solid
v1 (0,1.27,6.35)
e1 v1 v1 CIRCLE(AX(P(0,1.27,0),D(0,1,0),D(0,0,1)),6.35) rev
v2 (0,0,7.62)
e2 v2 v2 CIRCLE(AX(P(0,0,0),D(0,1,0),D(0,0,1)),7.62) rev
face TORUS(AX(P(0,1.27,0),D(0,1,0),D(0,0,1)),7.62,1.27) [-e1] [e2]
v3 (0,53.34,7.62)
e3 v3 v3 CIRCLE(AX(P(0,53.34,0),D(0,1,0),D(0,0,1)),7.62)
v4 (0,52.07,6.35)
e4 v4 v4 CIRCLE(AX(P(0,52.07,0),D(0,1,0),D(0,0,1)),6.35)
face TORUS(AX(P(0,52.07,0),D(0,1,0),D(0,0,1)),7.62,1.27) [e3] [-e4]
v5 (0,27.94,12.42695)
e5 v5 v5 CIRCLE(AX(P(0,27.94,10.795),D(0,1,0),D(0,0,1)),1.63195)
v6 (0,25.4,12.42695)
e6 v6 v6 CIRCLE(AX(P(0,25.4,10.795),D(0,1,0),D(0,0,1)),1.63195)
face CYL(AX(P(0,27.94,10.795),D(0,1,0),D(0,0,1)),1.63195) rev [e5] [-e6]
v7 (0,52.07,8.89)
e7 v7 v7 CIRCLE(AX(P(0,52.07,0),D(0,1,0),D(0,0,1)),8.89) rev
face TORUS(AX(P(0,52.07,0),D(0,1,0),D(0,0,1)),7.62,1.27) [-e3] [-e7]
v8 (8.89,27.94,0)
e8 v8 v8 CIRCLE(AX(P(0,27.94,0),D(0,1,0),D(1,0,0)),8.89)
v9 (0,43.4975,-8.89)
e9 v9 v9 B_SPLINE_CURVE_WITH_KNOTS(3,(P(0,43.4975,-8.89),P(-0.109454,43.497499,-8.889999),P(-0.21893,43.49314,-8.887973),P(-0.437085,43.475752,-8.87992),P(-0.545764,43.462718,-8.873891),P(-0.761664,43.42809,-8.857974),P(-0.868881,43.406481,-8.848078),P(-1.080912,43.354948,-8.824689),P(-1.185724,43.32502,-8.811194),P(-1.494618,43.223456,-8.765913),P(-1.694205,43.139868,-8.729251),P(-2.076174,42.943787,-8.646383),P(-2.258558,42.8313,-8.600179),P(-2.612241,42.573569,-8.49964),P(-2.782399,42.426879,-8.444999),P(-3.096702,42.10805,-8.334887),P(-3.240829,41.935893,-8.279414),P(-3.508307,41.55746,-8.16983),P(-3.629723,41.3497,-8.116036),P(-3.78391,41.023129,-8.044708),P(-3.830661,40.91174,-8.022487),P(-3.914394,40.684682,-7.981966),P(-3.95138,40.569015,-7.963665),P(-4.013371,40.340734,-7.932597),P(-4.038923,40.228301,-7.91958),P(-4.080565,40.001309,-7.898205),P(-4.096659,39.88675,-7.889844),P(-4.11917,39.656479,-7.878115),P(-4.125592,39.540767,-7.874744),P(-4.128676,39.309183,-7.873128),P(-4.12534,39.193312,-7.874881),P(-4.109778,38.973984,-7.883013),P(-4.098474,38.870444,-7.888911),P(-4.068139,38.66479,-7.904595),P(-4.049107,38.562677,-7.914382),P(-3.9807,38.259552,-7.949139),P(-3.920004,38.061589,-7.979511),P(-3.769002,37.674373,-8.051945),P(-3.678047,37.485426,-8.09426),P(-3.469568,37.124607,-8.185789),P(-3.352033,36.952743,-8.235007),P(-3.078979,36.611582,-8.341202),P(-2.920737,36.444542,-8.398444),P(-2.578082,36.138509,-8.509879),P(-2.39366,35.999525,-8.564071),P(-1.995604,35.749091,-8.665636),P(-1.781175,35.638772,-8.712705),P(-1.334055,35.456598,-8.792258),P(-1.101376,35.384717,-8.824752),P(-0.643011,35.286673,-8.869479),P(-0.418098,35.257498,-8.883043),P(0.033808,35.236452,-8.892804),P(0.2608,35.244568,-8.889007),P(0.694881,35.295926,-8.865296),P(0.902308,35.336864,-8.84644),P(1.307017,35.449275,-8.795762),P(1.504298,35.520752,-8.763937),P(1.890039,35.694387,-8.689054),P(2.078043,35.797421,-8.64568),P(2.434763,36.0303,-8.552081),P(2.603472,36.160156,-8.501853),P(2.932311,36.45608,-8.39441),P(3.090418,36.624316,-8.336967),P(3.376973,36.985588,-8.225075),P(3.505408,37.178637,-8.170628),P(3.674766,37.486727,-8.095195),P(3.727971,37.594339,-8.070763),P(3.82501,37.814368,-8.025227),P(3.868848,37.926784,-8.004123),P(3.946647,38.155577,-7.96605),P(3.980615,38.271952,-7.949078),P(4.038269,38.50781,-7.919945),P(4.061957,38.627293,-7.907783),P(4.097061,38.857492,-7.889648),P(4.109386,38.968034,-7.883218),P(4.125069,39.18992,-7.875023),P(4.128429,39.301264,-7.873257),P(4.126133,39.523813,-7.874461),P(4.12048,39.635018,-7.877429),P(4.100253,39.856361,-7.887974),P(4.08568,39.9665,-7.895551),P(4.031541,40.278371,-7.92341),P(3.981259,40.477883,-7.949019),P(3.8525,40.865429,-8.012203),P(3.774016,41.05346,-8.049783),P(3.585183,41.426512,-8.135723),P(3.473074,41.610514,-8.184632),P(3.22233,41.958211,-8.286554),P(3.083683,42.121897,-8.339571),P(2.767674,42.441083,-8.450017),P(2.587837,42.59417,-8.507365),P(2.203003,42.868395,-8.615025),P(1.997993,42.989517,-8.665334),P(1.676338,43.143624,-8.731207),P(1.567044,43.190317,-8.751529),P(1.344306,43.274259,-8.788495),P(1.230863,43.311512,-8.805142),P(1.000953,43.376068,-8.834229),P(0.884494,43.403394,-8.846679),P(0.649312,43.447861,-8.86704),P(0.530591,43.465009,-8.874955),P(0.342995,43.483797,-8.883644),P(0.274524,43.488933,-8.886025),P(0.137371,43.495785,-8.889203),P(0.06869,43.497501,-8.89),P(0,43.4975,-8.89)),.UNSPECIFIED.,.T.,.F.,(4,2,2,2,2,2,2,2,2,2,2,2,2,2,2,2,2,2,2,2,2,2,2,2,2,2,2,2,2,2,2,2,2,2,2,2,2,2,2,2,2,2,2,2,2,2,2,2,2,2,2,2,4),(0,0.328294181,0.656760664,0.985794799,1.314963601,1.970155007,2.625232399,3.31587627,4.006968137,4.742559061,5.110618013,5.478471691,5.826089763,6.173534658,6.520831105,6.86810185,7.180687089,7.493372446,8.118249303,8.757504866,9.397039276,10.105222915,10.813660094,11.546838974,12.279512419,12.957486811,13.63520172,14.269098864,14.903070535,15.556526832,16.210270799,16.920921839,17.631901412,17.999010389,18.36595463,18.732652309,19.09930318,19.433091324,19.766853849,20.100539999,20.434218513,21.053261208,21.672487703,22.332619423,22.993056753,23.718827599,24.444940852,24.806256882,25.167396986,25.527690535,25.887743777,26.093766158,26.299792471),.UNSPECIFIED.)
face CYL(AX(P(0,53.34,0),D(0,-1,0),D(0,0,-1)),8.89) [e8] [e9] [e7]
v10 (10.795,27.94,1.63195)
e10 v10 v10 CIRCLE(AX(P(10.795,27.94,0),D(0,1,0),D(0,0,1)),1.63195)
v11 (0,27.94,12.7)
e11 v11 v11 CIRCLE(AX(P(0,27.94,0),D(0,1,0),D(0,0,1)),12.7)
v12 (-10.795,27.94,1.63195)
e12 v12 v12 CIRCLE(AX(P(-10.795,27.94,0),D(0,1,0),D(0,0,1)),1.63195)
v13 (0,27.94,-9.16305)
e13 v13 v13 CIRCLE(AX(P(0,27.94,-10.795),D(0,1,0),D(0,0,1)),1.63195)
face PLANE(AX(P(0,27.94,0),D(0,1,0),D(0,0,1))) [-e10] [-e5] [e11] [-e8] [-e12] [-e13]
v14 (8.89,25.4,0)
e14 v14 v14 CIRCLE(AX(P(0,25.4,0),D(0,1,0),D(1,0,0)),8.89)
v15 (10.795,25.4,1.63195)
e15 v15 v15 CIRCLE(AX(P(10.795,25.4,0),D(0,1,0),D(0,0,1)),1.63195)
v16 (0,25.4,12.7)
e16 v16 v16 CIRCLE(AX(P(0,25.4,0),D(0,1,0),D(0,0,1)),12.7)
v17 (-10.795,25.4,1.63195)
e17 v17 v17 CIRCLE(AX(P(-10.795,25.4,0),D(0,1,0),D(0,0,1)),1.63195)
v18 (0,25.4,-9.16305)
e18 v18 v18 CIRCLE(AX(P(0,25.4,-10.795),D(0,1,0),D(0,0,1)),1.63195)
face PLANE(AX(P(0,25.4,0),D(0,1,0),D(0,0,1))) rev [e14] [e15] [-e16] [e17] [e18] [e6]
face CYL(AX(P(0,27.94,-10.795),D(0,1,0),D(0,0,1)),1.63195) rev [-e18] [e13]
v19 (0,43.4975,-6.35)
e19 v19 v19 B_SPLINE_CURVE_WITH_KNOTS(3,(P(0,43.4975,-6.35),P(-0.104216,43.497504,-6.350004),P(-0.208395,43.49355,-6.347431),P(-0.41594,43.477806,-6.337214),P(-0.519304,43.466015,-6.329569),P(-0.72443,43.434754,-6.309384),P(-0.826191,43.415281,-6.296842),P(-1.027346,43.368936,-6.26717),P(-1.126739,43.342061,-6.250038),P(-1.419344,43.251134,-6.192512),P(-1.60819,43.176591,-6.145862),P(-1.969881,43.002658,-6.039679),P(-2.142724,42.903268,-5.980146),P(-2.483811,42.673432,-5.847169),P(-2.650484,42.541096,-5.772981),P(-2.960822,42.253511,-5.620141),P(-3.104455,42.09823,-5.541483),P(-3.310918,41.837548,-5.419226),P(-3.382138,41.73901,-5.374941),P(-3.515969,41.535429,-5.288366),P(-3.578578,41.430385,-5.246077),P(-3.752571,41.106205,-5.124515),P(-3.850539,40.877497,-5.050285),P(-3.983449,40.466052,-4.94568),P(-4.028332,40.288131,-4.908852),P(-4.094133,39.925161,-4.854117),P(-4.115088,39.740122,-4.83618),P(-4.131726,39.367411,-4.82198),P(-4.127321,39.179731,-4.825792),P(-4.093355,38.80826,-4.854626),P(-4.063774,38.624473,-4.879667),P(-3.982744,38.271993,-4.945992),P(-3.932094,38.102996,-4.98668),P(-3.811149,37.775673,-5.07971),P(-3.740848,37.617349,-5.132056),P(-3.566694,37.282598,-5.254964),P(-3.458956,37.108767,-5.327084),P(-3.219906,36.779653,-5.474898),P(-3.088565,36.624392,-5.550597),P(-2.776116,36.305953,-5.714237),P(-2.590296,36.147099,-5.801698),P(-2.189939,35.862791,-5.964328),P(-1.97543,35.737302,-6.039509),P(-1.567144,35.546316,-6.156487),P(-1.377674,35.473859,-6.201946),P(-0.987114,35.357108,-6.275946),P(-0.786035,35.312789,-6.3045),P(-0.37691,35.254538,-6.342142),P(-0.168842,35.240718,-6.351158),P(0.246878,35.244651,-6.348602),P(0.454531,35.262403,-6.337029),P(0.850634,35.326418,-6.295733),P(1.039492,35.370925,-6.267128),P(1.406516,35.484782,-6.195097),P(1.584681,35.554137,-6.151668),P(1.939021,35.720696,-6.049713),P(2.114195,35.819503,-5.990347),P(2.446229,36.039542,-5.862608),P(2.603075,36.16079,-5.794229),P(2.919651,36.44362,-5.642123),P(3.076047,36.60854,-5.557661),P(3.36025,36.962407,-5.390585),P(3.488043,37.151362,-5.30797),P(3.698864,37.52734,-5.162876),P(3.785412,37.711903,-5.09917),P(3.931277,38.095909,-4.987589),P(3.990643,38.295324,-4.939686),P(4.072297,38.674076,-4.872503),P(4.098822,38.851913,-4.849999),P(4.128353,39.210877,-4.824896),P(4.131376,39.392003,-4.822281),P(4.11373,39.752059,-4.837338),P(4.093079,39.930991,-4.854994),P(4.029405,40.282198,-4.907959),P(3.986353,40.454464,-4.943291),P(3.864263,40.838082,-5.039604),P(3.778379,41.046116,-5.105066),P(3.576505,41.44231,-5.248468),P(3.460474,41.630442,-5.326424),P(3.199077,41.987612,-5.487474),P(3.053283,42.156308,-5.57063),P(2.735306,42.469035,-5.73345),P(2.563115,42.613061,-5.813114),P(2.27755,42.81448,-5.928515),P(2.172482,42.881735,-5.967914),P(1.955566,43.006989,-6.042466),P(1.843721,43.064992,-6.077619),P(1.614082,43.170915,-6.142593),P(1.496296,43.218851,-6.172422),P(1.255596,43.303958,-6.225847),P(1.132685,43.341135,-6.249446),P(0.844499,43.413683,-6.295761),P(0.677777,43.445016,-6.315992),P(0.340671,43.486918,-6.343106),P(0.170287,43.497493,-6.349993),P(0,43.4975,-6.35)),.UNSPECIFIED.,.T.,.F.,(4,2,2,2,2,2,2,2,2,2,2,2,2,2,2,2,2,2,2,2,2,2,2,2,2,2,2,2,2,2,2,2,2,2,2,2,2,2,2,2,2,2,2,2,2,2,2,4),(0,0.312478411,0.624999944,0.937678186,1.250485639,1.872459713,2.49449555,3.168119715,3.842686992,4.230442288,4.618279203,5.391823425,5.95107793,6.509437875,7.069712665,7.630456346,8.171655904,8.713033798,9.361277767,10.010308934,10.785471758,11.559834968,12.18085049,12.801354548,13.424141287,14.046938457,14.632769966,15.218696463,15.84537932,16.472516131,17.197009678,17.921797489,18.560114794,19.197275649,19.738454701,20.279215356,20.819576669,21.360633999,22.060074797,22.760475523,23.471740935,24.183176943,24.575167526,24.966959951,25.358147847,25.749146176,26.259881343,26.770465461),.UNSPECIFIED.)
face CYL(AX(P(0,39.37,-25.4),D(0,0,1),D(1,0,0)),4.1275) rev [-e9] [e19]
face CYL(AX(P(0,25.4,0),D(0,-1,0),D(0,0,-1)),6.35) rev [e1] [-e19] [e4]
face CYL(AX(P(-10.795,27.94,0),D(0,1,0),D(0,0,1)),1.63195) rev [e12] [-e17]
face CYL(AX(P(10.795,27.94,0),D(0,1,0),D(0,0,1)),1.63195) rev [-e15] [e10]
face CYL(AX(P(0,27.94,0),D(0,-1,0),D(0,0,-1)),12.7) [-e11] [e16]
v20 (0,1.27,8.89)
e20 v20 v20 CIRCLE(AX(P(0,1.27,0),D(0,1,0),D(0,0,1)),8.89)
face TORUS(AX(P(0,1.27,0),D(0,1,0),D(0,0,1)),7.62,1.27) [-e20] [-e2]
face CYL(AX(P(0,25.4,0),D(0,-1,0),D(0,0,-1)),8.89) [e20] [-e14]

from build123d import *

# Parameters (mm, degrees)
SKETCH1_R                 = 8.89
SKETCH1_R_2               = 6.35
EXTRUDE_THIN1_DEPTH       = 25.4
SKETCH2_R                 = 12.7
SKETCH2_R_2               = 6.35
BOSS_EXTRUDE1_DEPTH       = 2.54
SKETCH3_R                 = 8.89
SKETCH3_R_2               = 6.35
EXTRUDE_THIN2_DEPTH       = 25.4
SKETCH4_R                 = 4.1275
CUT_EXTRUDE1_DEPTH        = 25.4
F_4_CLEARANCE_HOLE1_D     = 3.2639
F_4_CLEARANCE_HOLE1_DEPTH = 25.4
F_4_CLEARANCE_HOLE1_TIP   = 0.980574487
FILLET2_R                 = 1.27
FILLET3_R                 = 1.27


with BuildPart() as part:
    # Sketch1 → Extrude-Thin1 (new body)
    with BuildSketch(Plane(origin=(0, 0, 0), x_dir=(1, 0, 0), z_dir=(0, 1, 0))):
        Circle(SKETCH1_R)
        Circle(SKETCH1_R_2, mode=Mode.SUBTRACT)
    extrude(amount=EXTRUDE_THIN1_DEPTH)

    # Sketch2 → Boss-Extrude1 (add)
    with BuildSketch(Plane(origin=(0, 25.4, 0), x_dir=(1, 0, 0), z_dir=(0, 1, 0))):
        with Locations(Location((0, 0, 0), (0, 0, 270))):
            Circle(SKETCH2_R)
        with Locations(Location((0, 0, 0), (0, 0, 270))):
            Circle(SKETCH2_R_2, mode=Mode.SUBTRACT)
    extrude(amount=BOSS_EXTRUDE1_DEPTH)

    # Sketch3 → Extrude-Thin2 (add)
    with BuildSketch(Plane(origin=(0, 27.94, 0), x_dir=(1, 0, 0), z_dir=(0, 1, 0))):
        Circle(SKETCH3_R)
        Circle(SKETCH3_R_2, mode=Mode.SUBTRACT)
    extrude(amount=EXTRUDE_THIN2_DEPTH)

    # Sketch4 → Cut-Extrude1 (cut)
    with BuildSketch(Plane.XY):
        with Locations(Location((0, 39.37, 0), (0, 0, 90))):
            Circle(SKETCH4_R)
    extrude(amount=-CUT_EXTRUDE1_DEPTH, mode=Mode.SUBTRACT)

    # #4 Clearance Hole1
    with Locations(Plane(origin=(0, 27.94, 0), x_dir=(-1, 0, 0), z_dir=(0, 1, 0))):
        with Locations((-10.795, 0), (0, -10.795), (0, 10.795), (10.795, 0)):
            Hole(F_4_CLEARANCE_HOLE1_D / 2, depth=F_4_CLEARANCE_HOLE1_DEPTH)
            with Locations((0, 0, -(F_4_CLEARANCE_HOLE1_DEPTH + F_4_CLEARANCE_HOLE1_TIP / 2))):  # 118° drill point
                Cone(0, F_4_CLEARANCE_HOLE1_D / 2, F_4_CLEARANCE_HOLE1_TIP, mode=Mode.SUBTRACT)

    # Fillet2
    # the kernel refuses this fillet: 1.27 mm, written as the material it takes off along each edge
    with BuildSketch(Plane(origin=(0, 0, 0), x_dir=(1, 0, 0), z_dir=(0, 0, 1))) as fillet2_piece_1:
        with BuildLine():
            CenterArc((8.89 - FILLET2_R, FILLET2_R), FILLET2_R, 270, 90)
            Line((8.89 - FILLET2_R, 0), (8.89, 0))
            Line((8.89, 0), (8.89, FILLET2_R))
        make_face()
    revolve(axis=Axis((0, 0, 0), (0, 1, 0)), mode=Mode.SUBTRACT)
    with BuildSketch(Plane(origin=(0, 0, 0), x_dir=(1, 0, 0), z_dir=(0, 0, 1))) as fillet2_piece_2:
        with BuildLine():
            CenterArc((6.35 + FILLET2_R, FILLET2_R), FILLET2_R, 180, 90)
            Line((6.35, FILLET2_R), (6.35, 0))
            Line((6.35, 0), (6.35 + FILLET2_R, 0))
        make_face()
    revolve(axis=Axis((0, 0, 0), (0, 1, 0)), mode=Mode.SUBTRACT)

    # Fillet3
    # the kernel refuses this fillet: 1.27 mm, written as the material it takes off along each edge
    with BuildSketch(Plane(origin=(0, 53.34, 0), x_dir=(1, 0, 0), z_dir=(0, 0, 1))) as fillet3_piece_1:
        with BuildLine():
            CenterArc((8.89 - FILLET3_R, -FILLET3_R), FILLET3_R, 0, 90)
            Line((8.89 - FILLET3_R, 0), (8.89, 0))
            Line((8.89, 0), (8.89, -FILLET3_R))
        make_face()
    revolve(axis=Axis((0, 53.34, 0), (0, 1, 0)), mode=Mode.SUBTRACT)
    with BuildSketch(Plane(origin=(0, 53.34, 0), x_dir=(1, 0, 0), z_dir=(0, 0, 1))) as fillet3_piece_2:
        with BuildLine():
            CenterArc((6.35 + FILLET3_R, -FILLET3_R), FILLET3_R, 90, 90)
            Line((6.35 + FILLET3_R, 0), (6.35, 0))
            Line((6.35, 0), (6.35, -FILLET3_R))
        make_face()
    revolve(axis=Axis((0, 53.34, 0), (0, 1, 0)), mode=Mode.SUBTRACT)


solid = part.part
